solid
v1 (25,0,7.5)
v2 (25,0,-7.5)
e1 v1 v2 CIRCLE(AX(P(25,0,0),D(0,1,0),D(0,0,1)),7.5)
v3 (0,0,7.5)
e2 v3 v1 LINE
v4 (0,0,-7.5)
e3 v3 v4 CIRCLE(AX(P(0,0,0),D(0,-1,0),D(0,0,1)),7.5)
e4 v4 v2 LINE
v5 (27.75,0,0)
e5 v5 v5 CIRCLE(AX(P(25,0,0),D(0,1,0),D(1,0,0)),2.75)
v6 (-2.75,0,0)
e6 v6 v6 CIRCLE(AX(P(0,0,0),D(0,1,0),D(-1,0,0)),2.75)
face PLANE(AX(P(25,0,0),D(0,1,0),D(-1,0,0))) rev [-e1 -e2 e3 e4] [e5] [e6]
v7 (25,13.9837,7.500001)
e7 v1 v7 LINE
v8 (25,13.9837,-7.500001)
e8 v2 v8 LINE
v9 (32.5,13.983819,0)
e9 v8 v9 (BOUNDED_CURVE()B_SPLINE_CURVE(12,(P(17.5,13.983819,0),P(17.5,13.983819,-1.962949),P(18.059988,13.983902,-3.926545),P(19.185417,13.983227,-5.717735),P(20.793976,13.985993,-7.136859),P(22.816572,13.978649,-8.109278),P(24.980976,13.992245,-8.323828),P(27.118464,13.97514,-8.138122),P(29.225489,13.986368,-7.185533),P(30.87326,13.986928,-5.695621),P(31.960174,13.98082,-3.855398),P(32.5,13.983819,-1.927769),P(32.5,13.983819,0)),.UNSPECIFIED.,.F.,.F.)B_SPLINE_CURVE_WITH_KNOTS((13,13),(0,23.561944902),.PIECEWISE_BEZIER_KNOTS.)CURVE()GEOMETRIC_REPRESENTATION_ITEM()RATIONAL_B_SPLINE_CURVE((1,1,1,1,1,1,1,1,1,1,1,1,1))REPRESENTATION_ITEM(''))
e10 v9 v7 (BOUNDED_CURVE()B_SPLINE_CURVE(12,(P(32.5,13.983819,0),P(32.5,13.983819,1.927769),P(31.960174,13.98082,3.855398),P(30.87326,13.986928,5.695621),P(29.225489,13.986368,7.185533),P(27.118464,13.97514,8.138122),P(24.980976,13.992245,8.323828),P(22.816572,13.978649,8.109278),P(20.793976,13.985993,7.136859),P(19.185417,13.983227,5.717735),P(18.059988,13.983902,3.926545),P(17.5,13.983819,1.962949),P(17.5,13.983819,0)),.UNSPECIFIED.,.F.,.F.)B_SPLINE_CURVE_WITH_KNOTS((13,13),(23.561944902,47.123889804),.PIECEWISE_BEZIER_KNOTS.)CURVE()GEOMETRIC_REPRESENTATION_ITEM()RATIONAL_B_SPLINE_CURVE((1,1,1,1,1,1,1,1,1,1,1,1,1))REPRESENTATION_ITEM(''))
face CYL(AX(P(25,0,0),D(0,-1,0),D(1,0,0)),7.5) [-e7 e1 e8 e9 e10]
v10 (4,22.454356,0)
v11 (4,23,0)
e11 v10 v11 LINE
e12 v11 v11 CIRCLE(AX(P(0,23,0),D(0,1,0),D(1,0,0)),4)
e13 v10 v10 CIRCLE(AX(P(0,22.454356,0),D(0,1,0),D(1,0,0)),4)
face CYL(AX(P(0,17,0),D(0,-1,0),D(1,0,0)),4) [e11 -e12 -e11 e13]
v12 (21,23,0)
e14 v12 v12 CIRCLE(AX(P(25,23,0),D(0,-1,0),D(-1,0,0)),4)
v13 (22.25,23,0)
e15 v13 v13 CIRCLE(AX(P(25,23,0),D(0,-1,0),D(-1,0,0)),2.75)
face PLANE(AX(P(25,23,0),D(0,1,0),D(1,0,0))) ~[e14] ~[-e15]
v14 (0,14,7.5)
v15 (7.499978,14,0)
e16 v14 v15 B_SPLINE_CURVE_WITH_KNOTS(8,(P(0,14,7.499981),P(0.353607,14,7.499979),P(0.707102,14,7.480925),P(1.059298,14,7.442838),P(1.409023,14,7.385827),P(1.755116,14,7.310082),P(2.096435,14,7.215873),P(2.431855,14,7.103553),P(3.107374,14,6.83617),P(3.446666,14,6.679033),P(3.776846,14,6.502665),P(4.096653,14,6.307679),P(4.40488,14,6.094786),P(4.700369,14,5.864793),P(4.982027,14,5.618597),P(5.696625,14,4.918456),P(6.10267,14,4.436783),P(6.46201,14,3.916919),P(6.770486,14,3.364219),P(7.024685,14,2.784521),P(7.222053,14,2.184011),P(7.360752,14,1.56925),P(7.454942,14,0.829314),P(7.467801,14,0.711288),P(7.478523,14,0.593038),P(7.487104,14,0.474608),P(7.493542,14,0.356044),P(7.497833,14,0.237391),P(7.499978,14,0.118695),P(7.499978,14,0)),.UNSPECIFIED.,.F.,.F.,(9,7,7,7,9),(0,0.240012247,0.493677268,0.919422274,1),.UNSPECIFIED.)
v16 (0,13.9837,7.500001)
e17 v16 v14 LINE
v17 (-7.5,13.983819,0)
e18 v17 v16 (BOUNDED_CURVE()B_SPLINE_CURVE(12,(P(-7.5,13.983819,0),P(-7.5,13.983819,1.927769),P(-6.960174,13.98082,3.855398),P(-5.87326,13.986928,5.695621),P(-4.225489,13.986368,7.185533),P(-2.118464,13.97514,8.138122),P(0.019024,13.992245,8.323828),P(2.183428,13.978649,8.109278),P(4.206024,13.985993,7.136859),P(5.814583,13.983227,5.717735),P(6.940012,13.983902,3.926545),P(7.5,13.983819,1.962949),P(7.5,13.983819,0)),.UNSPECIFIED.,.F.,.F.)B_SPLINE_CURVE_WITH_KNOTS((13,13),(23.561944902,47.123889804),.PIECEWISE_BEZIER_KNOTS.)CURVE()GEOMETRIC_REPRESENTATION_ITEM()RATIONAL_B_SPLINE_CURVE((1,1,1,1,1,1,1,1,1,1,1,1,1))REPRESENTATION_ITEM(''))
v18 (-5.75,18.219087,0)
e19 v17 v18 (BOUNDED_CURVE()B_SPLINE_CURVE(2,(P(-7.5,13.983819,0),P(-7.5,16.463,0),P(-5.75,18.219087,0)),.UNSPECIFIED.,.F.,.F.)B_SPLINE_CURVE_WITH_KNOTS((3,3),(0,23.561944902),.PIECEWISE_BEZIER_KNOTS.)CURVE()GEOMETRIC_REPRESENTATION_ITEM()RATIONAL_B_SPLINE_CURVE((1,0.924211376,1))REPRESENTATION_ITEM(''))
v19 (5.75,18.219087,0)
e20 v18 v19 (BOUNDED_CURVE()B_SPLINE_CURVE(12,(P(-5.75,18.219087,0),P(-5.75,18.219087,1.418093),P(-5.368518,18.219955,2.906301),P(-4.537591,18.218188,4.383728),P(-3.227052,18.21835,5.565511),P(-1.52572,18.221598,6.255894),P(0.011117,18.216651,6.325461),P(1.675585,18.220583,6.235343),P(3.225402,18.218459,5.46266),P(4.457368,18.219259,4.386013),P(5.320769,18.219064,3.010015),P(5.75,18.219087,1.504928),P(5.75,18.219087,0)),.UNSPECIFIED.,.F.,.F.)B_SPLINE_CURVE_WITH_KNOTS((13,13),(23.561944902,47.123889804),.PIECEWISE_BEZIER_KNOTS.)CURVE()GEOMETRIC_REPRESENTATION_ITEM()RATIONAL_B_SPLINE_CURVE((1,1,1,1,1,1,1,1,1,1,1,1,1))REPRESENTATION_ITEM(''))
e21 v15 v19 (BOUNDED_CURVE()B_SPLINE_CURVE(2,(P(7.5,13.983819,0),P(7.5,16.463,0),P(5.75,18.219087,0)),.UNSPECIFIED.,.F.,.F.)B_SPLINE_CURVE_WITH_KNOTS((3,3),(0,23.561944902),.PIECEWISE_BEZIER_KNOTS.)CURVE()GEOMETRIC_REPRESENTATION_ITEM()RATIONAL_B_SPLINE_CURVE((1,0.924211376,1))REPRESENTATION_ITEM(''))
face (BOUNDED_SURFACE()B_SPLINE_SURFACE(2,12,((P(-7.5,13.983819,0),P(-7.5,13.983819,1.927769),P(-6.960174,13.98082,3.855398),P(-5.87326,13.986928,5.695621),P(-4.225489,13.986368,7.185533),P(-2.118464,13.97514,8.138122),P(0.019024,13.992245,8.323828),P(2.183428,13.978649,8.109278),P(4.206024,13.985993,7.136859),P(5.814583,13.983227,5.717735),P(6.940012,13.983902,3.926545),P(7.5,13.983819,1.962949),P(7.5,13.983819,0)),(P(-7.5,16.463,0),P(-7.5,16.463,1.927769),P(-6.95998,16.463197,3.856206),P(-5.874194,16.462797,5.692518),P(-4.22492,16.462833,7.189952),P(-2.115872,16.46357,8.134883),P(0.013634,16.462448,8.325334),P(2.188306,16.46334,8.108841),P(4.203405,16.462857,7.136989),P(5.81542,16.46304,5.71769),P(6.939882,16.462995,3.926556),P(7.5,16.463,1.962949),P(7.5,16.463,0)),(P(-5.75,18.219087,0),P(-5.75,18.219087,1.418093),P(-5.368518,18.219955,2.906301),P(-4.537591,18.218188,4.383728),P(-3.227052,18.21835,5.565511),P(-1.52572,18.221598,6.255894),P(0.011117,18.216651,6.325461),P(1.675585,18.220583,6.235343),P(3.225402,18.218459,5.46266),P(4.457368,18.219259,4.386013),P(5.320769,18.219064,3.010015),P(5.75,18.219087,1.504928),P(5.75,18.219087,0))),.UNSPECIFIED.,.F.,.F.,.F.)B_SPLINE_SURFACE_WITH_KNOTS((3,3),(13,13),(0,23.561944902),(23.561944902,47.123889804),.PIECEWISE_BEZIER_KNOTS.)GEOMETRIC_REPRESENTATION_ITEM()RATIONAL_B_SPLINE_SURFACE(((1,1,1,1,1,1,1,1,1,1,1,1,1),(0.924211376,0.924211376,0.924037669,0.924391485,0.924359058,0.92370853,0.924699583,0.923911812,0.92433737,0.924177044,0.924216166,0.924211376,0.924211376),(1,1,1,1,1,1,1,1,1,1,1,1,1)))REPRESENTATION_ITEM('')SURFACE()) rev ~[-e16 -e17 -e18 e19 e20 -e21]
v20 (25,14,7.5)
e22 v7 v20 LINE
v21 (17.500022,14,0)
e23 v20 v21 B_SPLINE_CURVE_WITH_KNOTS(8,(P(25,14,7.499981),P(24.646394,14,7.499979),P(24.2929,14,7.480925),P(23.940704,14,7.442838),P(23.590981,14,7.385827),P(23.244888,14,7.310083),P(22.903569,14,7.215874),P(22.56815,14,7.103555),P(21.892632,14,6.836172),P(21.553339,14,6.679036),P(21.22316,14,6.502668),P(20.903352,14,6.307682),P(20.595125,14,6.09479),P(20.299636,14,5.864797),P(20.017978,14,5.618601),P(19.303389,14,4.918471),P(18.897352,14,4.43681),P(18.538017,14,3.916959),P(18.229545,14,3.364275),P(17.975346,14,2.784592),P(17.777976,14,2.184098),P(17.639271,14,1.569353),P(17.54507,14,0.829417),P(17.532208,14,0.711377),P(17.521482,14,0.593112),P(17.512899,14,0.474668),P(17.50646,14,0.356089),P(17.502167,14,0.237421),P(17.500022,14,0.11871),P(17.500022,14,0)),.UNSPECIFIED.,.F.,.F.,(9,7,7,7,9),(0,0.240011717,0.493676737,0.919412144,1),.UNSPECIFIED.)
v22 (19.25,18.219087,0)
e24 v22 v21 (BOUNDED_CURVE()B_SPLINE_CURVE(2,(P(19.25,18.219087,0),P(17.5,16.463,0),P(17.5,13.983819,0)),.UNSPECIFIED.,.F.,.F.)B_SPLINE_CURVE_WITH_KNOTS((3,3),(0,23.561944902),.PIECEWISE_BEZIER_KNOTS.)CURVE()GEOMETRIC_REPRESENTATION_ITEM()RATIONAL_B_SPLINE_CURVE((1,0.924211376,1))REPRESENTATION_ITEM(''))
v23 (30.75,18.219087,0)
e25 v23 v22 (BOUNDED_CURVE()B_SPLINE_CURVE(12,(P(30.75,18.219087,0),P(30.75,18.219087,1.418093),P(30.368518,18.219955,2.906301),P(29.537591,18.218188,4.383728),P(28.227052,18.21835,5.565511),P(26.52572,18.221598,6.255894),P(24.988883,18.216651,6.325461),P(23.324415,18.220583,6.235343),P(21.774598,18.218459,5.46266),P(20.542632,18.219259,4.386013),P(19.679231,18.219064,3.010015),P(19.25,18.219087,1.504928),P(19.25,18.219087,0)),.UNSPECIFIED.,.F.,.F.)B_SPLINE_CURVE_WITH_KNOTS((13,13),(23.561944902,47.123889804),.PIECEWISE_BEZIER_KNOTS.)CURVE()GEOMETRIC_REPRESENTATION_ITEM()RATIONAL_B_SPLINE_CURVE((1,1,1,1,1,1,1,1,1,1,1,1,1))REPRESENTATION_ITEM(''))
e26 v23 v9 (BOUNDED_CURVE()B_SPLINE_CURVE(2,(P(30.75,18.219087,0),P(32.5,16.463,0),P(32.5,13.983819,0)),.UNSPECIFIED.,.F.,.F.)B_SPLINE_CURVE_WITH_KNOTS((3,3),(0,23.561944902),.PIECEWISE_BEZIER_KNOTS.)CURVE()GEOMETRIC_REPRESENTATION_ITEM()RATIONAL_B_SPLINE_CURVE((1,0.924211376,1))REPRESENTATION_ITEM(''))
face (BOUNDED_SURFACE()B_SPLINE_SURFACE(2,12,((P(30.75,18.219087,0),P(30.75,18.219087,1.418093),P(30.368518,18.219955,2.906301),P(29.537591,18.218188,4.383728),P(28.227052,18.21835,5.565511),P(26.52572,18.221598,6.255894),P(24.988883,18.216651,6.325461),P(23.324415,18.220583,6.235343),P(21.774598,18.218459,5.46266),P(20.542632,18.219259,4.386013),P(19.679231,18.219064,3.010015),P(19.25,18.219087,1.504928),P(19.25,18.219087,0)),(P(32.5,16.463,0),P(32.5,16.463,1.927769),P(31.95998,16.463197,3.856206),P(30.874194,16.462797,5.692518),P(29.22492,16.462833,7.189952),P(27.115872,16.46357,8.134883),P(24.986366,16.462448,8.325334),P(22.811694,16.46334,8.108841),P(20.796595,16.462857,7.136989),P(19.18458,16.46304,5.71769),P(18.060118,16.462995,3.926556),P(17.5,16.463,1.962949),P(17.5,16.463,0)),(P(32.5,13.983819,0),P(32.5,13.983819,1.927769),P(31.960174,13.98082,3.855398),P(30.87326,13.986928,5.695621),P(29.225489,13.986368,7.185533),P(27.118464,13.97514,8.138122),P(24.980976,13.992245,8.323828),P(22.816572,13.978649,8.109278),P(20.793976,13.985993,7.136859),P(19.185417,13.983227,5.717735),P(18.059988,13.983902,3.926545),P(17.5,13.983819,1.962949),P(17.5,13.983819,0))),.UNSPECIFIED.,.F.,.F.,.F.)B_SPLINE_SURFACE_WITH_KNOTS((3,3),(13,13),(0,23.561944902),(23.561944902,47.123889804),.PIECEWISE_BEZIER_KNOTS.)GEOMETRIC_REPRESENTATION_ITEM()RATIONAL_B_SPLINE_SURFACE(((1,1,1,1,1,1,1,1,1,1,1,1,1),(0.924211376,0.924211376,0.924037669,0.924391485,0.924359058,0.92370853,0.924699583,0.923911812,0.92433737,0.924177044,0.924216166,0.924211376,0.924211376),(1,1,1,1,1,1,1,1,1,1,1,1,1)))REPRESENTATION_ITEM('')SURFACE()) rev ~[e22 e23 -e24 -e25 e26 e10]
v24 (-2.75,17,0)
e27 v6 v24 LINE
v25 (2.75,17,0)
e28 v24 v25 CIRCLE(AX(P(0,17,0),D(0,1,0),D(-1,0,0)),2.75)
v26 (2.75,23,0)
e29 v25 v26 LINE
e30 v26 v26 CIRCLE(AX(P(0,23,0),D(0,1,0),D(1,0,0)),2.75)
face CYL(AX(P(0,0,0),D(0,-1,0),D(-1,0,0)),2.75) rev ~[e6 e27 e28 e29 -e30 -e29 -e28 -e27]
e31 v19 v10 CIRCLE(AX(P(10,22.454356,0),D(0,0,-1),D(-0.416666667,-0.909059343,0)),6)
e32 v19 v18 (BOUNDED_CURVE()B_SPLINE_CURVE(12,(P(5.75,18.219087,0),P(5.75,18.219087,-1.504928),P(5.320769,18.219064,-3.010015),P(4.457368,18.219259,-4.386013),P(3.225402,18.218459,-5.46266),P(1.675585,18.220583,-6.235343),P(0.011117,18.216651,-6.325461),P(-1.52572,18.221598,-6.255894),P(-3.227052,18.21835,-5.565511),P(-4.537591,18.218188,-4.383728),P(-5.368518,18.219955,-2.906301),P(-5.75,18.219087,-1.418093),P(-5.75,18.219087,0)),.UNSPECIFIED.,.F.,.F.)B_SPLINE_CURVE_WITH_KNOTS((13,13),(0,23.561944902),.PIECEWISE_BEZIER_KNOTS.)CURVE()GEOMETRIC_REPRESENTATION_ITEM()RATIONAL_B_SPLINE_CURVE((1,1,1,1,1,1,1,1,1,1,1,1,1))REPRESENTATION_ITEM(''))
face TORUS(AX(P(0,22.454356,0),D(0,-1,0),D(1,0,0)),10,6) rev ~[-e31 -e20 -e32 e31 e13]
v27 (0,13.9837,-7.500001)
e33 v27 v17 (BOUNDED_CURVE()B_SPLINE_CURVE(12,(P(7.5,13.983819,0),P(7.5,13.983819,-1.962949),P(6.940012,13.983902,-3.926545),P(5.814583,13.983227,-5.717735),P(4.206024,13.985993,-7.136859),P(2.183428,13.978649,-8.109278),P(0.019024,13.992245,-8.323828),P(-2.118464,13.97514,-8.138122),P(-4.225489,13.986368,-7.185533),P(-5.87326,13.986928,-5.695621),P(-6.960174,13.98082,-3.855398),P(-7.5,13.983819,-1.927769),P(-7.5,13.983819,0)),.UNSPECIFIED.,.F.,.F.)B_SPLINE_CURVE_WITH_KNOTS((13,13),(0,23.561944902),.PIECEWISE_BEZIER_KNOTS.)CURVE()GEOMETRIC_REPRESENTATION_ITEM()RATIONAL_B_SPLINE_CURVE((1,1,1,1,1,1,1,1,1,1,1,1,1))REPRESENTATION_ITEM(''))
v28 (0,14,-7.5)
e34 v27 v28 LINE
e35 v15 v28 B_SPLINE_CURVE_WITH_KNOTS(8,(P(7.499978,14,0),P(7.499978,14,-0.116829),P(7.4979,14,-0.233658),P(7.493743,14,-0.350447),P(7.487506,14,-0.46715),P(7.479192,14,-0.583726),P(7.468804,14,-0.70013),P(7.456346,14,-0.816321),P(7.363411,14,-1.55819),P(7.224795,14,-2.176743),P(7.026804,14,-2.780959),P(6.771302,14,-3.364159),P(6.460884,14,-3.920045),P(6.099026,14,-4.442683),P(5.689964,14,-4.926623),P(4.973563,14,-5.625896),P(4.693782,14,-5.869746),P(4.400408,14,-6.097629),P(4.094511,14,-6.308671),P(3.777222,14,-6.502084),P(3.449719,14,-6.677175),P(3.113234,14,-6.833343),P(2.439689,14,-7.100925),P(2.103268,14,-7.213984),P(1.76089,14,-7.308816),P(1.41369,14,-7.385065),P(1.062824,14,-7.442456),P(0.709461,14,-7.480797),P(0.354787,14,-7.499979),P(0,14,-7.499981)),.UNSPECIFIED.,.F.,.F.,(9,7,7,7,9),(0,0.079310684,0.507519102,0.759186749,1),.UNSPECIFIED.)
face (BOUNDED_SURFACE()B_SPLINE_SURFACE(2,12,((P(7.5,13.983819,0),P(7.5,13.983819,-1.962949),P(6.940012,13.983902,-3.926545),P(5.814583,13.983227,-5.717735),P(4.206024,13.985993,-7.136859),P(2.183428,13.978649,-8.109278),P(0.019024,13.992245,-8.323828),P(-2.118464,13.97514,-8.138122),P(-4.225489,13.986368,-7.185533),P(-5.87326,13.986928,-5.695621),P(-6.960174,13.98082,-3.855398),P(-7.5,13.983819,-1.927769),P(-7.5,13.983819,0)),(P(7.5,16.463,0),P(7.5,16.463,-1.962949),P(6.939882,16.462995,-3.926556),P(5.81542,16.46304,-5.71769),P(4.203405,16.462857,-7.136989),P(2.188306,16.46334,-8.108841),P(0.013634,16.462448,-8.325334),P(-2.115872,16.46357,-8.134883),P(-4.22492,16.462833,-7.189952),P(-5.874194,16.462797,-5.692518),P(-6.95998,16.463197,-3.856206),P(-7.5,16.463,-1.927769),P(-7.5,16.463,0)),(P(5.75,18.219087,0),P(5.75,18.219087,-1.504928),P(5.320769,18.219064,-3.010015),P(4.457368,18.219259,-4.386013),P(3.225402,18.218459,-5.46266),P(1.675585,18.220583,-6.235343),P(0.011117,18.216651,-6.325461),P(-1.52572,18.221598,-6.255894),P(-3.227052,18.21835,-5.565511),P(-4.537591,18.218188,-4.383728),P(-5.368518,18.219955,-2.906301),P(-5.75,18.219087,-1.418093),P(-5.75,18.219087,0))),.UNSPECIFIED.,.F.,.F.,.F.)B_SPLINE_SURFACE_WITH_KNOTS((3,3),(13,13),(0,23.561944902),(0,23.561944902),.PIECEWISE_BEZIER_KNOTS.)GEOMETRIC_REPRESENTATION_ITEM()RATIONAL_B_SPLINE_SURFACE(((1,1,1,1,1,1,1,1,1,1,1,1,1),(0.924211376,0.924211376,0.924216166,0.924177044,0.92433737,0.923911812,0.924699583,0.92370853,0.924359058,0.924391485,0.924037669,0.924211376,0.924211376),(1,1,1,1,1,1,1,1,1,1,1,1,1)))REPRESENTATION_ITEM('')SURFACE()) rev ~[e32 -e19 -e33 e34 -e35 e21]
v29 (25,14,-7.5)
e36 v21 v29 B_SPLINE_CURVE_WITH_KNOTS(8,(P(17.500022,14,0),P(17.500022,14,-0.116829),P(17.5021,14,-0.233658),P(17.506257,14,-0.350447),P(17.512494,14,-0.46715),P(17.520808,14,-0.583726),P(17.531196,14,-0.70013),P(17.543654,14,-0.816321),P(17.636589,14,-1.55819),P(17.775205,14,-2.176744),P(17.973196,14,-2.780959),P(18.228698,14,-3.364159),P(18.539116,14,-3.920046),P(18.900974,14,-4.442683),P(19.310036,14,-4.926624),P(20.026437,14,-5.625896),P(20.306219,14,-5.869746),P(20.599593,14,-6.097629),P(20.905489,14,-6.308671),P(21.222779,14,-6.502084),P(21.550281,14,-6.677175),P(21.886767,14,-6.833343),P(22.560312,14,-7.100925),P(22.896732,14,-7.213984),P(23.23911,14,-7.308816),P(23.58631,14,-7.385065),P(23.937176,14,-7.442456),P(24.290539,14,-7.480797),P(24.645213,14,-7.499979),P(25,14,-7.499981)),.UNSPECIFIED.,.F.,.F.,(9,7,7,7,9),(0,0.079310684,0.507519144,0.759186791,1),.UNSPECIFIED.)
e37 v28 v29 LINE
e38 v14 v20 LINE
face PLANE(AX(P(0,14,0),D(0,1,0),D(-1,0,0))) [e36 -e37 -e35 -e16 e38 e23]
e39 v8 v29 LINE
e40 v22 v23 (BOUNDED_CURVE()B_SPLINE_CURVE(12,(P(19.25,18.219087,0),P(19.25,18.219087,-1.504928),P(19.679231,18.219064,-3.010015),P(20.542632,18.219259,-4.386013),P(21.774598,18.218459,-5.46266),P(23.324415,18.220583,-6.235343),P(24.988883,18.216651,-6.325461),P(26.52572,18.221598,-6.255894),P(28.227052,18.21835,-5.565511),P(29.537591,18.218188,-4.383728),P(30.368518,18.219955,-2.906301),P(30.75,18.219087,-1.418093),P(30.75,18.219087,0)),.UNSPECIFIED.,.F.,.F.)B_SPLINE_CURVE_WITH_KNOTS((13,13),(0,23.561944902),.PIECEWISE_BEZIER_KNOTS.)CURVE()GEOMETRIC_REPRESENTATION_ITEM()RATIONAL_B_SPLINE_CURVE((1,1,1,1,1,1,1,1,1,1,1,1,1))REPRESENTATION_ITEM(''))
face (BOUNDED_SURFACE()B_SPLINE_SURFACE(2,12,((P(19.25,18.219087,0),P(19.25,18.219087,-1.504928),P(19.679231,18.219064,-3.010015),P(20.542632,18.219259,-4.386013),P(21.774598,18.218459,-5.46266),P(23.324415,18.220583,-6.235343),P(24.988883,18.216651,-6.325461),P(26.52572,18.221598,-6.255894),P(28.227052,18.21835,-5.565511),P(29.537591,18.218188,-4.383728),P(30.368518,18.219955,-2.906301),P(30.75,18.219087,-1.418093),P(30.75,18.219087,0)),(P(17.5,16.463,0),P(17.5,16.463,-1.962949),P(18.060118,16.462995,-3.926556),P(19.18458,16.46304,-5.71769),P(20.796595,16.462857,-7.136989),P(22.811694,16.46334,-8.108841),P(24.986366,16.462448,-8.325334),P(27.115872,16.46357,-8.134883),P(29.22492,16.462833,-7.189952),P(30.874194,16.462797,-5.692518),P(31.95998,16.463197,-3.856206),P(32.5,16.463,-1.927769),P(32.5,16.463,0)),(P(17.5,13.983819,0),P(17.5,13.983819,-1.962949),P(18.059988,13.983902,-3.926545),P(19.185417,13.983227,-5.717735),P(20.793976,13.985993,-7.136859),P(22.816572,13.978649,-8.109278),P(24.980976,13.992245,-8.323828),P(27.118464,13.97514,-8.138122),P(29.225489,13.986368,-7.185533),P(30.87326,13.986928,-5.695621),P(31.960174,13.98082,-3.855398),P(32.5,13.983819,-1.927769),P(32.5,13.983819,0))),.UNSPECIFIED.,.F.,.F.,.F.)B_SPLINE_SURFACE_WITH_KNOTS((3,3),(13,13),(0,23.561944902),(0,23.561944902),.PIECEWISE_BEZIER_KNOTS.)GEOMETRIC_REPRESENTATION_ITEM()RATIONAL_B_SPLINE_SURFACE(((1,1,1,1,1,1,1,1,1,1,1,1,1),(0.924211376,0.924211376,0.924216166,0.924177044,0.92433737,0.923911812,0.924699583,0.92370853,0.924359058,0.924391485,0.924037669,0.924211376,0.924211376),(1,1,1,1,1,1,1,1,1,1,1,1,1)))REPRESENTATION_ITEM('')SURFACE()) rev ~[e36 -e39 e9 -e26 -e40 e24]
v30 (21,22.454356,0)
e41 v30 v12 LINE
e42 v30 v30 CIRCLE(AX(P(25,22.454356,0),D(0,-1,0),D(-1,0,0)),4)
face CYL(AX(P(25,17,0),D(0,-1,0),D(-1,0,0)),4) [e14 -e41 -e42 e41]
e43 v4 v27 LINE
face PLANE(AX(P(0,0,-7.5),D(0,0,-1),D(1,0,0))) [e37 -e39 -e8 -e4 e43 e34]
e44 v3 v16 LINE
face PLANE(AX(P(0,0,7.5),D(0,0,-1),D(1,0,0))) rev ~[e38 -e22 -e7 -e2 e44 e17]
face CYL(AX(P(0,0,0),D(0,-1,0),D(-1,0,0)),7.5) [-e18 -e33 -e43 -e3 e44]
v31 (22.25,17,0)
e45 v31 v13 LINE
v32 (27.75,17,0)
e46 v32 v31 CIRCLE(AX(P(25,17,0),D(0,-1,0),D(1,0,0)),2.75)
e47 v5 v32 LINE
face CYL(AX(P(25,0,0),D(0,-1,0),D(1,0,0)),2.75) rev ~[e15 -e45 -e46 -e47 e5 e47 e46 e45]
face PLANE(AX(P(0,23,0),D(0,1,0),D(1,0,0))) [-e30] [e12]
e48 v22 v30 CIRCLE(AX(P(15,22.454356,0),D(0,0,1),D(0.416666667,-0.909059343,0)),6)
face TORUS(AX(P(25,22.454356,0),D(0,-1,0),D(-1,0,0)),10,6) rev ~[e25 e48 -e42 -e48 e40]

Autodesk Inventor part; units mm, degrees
ref_plane "XZ Plane" through (0, 0, 0) normal (0, 1, 0) x (-1, 0, 0)
ref_plane "XY Plane" through (0, 0, 0) normal (0, 0, 1) x (1, 0, 0)
sketch "Sketch1" plane through (0, 0, 0) normal (0, 1, 0) x (-1, 0, 0)
  circle A0 centre (0, 0) radius 7.5
  circle A1 centre (0, 0) radius 2.75
  dimension "d0" = 15
  dimension "d1" = 5.5
extrude "Extrusion1" add sketch "Sketch1" along normal blind 17
sketch "Sketch2" plane through (0, 17, 0) normal (0, 1, 0) x (1, 0, 0)
  circle A0 centre (0, 0) radius 2.75 projected
  circle A1 centre (0, 0) radius 2.75
  circle A2 centre (0, 0) radius 4
  dimension "d4" = 5.5
  dimension "d5" = 8
extrude "Extrusion2" add sketch "Sketch2" along normal blind 6
fillet "Fillet1" radius 6 1 edges at (-4, 17, 0)
fillet "Fillet2" radius 6 2 edges at (0, 17, -7.5) (0, 17, 7.5)
ref_plane "Work Plane1" through (12.5, 0, 0) normal (1, 0, 0) x (0, 1, 0)
mirror "Mirror1" about plane through (12.5, 0, 0) normal (1, 0, 0) of "Extrusion1", "Extrusion2", "Fillet1", "Fillet2"
sketch "Sketch3" plane through (0, 0, 0) normal (0, 1, 0) x (-1, 0, 0)
  circle A0 centre (-25, 0) radius 2.75 projected
  line L0 (-25, 0) -> (-25, 2.75)
  line L1 (-25, 0) -> (-25, -2.75)
  line L2 (0, 0) -> (0, -2.75)
  circle A1 centre (0, 0) radius 2.75 projected
  line L3 (0, 0) -> (0, 2.75)
  line L4 (-25, 2.75) -> (0, 2.75)
  line L5 (0, 2.75) -> (0, 7.5)
  line L6 (0, 7.5) -> (-25, 7.5)
  line L7 (-25, 7.5) -> (-25, 2.75)
  line L8 (-25, -2.75) -> (0, -2.75)
  line L9 (0, -2.75) -> (0, -7.5)
  line L10 (0, -7.5) -> (-25, -7.5)
  line L11 (-25, -7.5) -> (-25, -2.75)
  dimension "d11" = 25
  dimension "d12" = 4.75
  dimension "d13" = 25
  dimension "d14" = 4.75
extrude "Extrusion3" add sketch "Sketch3" along normal blind 14 contours A0 L4 A1 L8 | L7 L6 L5 L4 | L8 L9 L10 L11
properties part number "4mm_Roller_Spacer_simple3mm"
